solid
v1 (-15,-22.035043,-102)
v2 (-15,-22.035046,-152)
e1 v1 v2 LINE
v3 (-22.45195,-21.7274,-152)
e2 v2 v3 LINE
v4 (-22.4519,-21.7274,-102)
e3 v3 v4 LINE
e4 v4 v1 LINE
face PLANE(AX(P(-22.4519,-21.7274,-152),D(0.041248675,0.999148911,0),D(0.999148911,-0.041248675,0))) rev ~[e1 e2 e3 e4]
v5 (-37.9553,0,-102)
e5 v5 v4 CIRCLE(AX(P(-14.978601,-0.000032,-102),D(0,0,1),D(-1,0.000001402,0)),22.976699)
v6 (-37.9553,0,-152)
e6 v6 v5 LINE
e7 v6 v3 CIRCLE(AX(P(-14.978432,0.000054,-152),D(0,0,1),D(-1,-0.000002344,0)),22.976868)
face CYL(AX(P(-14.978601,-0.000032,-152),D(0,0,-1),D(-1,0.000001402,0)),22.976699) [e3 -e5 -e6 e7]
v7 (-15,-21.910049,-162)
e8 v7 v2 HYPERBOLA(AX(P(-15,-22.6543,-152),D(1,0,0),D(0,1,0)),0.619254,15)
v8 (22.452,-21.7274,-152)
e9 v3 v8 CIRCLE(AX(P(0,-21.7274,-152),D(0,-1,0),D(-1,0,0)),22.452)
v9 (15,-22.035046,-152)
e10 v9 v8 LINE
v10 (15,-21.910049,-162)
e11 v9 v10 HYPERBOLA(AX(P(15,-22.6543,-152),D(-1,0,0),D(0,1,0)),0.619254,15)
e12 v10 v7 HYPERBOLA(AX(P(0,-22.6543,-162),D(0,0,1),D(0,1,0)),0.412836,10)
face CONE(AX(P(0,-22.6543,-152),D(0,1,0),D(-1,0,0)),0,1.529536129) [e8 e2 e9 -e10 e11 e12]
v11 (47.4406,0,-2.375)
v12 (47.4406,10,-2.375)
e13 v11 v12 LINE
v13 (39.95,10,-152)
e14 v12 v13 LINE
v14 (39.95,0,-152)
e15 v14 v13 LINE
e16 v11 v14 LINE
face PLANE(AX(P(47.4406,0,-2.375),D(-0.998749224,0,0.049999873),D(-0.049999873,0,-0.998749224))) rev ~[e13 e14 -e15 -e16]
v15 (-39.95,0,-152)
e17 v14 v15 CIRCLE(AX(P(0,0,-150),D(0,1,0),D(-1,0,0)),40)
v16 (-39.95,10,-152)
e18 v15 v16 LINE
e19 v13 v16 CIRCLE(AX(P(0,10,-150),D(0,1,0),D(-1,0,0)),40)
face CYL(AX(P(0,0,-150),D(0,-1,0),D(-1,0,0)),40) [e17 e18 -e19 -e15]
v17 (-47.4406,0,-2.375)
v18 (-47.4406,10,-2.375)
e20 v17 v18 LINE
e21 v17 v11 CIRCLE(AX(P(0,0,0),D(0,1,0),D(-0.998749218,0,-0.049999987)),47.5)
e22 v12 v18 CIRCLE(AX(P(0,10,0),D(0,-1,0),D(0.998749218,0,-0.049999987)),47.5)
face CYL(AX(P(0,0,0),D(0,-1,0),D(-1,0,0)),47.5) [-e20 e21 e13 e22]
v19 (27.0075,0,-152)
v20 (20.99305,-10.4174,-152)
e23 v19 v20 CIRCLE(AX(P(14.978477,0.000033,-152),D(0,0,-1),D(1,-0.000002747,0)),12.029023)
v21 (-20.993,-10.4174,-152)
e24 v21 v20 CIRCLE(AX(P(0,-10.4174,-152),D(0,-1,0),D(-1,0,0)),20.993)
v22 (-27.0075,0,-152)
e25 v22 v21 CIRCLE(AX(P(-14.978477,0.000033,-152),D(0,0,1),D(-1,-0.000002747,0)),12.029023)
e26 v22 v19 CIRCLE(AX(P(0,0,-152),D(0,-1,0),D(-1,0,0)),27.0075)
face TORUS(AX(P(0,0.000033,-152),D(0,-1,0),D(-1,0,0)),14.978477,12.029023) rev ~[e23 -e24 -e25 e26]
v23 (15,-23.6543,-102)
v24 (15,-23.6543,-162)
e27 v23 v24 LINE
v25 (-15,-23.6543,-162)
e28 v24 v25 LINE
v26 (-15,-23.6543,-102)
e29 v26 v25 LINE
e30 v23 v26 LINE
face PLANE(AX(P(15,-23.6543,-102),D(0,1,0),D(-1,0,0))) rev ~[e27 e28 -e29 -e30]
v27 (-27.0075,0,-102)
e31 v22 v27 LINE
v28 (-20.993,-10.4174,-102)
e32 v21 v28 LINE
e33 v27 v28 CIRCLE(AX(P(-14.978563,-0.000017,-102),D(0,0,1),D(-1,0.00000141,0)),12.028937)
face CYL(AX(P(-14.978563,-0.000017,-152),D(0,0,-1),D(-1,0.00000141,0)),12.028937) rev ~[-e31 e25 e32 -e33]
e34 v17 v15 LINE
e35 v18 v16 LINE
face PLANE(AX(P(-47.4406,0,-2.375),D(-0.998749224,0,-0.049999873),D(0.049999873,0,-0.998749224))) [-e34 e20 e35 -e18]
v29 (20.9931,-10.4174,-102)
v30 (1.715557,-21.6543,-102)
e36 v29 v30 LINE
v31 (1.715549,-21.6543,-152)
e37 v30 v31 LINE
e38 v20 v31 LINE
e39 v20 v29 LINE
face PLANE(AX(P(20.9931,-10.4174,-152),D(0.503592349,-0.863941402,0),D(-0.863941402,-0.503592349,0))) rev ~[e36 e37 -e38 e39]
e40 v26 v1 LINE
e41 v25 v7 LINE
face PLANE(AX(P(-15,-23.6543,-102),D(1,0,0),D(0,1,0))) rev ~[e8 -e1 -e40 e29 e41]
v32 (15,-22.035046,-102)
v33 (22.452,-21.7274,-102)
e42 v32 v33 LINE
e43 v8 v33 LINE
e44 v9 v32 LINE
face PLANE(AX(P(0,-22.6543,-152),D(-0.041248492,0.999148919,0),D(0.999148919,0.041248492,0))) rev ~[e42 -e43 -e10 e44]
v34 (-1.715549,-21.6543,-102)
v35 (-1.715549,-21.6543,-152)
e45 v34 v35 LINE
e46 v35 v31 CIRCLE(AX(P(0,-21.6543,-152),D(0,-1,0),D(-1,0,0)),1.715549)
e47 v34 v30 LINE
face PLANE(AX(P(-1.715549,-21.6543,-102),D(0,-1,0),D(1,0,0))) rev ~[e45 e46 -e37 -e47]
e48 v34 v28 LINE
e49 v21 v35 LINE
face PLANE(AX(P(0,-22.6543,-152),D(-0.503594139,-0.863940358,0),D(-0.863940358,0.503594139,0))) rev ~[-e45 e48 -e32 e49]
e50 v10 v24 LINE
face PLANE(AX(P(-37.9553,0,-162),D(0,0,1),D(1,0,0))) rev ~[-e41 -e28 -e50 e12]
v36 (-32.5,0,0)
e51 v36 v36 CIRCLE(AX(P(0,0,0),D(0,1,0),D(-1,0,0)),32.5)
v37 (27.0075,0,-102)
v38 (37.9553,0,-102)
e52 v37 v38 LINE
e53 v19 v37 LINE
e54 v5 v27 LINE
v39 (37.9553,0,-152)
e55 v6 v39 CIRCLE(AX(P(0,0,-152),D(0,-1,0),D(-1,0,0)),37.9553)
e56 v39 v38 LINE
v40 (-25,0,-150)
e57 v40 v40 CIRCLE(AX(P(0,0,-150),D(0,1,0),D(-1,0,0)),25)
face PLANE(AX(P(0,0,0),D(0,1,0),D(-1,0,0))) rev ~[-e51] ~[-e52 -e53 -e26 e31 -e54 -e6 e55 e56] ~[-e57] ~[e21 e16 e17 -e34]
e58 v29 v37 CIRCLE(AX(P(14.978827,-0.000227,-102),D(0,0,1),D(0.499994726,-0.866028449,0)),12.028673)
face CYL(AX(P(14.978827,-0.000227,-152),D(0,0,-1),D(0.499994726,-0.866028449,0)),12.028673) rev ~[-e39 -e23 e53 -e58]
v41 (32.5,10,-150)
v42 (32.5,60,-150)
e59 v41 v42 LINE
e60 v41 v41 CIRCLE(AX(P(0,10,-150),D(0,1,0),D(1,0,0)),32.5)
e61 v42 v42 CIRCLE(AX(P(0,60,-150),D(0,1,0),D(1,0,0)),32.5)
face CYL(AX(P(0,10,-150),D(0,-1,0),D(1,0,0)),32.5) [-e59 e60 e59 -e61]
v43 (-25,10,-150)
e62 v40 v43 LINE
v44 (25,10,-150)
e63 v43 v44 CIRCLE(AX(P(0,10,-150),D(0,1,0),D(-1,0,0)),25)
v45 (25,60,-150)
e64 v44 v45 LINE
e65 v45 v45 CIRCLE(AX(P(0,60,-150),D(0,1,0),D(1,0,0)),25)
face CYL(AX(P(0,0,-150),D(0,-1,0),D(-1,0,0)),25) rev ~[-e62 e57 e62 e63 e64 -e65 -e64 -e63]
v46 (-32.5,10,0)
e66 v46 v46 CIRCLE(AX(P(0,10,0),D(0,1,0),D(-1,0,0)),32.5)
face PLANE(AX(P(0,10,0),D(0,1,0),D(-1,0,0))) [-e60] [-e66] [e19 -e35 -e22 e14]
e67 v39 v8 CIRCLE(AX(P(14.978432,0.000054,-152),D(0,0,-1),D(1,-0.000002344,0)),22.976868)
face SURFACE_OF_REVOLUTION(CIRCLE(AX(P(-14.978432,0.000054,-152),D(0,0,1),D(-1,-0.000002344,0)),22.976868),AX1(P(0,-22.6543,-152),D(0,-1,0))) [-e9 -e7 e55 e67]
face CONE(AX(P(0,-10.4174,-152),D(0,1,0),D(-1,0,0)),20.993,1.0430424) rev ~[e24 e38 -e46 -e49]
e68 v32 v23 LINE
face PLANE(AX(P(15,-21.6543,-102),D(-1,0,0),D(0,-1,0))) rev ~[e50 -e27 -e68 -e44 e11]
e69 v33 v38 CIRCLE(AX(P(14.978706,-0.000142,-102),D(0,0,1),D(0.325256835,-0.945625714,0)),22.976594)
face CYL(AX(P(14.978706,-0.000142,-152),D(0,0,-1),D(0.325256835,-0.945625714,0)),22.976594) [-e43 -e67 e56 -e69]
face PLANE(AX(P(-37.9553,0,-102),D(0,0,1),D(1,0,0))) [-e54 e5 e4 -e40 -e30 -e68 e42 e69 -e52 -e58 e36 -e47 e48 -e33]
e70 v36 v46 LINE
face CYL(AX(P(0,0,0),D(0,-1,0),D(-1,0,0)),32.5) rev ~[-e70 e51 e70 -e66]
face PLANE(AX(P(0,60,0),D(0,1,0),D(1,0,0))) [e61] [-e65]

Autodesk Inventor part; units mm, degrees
ref_plane "YZ Plane" through (0, 0, 0) normal (1, 0, 0) x (0, 1, 0)
ref_plane "XZ Plane" through (0, 0, 0) normal (0, 1, 0) x (-1, 0, 0)
sketch "Skizze1" plane through (0, 0, 0) normal (0, 1, 0) x (-1, 0, 0)
  circle A0 centre (0, 0) radius 32.5
  circle A1 centre (0, 0) radius 47.5
  line L0 (0, 0) -> (0, -150) construction
  circle A2 centre (0, -150) radius 25
  circle A3 centre (0, -150) radius 40
  line L1 (47.4406, -2.375) -> (39.95, -152)
  line L2 (-47.4406, -2.375) -> (-39.95, -152)
  dimension "d0" = 65
  dimension "d1" = 15
  dimension "d2" = 150
  dimension "d3" = 50
  dimension "d4" = 15
extrude "Extrusion1" add sketch "Skizze1" along normal blind 10
sketch "Skizze2" plane through (0, 10, 0) normal (0, 1, 0) x (1, 0, 0)
  circle A0 centre (0, 150) radius 25 projected
  circle A1 centre (0, 150) radius 32.5
  point P0 (0, 0)
  dimension "d7" = 7.5
extrude "Extrusion2" add sketch "Skizze2" along normal blind 50
ref_plane "Arbeitsebene1" through (0, 0, -190) normal (-1, 0, 0) x (0, -1, 0)
sketch "Skizze3" plane through (0, 0, -190) normal (-1, 0, 0) x (0, -1, 0)
  line L0 (0, 38) -> (0, 0) projected
  line L1 (0, 10.9925) -> (10.9925, 10.9925) construction
  line L2 (0, 10.9925) -> (0, 0) construction
  line L3 (0, 0) -> (0, 3)
  line L4 (0, 38) -> (-10, 38) construction
  line L5 (0, 38) -> (16.612, 38) construction
  arc A0 (0, 10.9925) -> (10.4174, 17.007) centre (0, 23.0214) ccw
  line L6 (0, 23.0214) -> (12.0289, 23.0214) construction
  line L7 (0, 23.0214) -> (0, 10.9925) construction
  line L8 (-10.9478, 2.8205) -> (-10.9478, 33.9693) construction
  line L9 (-10.9478, 33.9693) -> (20.2009, 33.9693) construction
  line L10 (22.6543, 38) -> (21.7274, 15.548)
  arc A1 (0, 0.0447) -> (21.7274, 15.548) centre (0, 23.0214) ccw
  line L11 (0, 10.9925) -> (0, 3)
  line L12 (10.4174, 17.007) -> (22.6543, 38)
  point P0 (0, 190)
  dimension "d12" = 90
revolve "Umdrehung1" add sketch "Skizze3" angle 180 mid plane about axis through (0, 0, -152) along (0, -1, 0)
sketch "Skizze4" plane through (-37.9553, 0, -152) normal (0, 0, 1) x (1, 0, 0)
  line L0 (64.9628, 0) -> (75.9106, 0) projected
  arc A0 (58.9484, -10.4174) -> (64.9628, 0) centre (52.9339, 0) ccw projected
  line L1 (58.9484, -10.4174) -> (37.9553, -22.6543) projected
  line L2 (37.9553, -22.6543) -> (60.4073, -21.7274) projected
  arc A1 (60.4073, -21.7274) -> (75.9106, 0) centre (52.9339, 0) ccw projected
  line L3 (0, 0) -> (10.9478, 0) projected
  arc A2 (0, 0) -> (15.5034, -21.7274) centre (22.9768, 0) ccw projected
  line L4 (15.5034, -21.7274) -> (37.9553, -22.6543) projected
  line L5 (37.9553, -22.6543) -> (16.9623, -10.4174) projected
  arc A3 (10.9478, 0) -> (16.9623, -10.4174) centre (22.9768, 0) ccw projected
  point P0 (37.9553, 0)
extrude "Extrusion3" add sketch "Skizze4" along normal blind 50
sketch "Skizze5" plane through (-37.9553, 0, -102) normal (0, 0, 1) x (1, 0, 0)
  line L0 (22.9553, -21.6543) -> (52.9553, -21.6543)
  line L1 (52.9553, -21.6543) -> (52.9553, -23.6543)
  line L2 (52.9553, -23.6543) -> (22.9553, -23.6543)
  line L3 (22.9553, -23.6543) -> (22.9553, -21.6543)
  line L4 (37.9553, -22.6543) -> (16.9623, -10.4174) projected
  line L5 (22.9553, -21.6543) -> (52.9553, -23.6543) construction
  line L6 (52.9553, -21.6543) -> (22.9553, -23.6543) construction
  point P0 (37.9553, 0)
  dimension "d16" = 30
  dimension "d17" = 2
extrude "Extrusion4" add sketch "Skizze5" against normal blind 60
properties part number "Absaugschuh" material "PET-Kunststoff"
